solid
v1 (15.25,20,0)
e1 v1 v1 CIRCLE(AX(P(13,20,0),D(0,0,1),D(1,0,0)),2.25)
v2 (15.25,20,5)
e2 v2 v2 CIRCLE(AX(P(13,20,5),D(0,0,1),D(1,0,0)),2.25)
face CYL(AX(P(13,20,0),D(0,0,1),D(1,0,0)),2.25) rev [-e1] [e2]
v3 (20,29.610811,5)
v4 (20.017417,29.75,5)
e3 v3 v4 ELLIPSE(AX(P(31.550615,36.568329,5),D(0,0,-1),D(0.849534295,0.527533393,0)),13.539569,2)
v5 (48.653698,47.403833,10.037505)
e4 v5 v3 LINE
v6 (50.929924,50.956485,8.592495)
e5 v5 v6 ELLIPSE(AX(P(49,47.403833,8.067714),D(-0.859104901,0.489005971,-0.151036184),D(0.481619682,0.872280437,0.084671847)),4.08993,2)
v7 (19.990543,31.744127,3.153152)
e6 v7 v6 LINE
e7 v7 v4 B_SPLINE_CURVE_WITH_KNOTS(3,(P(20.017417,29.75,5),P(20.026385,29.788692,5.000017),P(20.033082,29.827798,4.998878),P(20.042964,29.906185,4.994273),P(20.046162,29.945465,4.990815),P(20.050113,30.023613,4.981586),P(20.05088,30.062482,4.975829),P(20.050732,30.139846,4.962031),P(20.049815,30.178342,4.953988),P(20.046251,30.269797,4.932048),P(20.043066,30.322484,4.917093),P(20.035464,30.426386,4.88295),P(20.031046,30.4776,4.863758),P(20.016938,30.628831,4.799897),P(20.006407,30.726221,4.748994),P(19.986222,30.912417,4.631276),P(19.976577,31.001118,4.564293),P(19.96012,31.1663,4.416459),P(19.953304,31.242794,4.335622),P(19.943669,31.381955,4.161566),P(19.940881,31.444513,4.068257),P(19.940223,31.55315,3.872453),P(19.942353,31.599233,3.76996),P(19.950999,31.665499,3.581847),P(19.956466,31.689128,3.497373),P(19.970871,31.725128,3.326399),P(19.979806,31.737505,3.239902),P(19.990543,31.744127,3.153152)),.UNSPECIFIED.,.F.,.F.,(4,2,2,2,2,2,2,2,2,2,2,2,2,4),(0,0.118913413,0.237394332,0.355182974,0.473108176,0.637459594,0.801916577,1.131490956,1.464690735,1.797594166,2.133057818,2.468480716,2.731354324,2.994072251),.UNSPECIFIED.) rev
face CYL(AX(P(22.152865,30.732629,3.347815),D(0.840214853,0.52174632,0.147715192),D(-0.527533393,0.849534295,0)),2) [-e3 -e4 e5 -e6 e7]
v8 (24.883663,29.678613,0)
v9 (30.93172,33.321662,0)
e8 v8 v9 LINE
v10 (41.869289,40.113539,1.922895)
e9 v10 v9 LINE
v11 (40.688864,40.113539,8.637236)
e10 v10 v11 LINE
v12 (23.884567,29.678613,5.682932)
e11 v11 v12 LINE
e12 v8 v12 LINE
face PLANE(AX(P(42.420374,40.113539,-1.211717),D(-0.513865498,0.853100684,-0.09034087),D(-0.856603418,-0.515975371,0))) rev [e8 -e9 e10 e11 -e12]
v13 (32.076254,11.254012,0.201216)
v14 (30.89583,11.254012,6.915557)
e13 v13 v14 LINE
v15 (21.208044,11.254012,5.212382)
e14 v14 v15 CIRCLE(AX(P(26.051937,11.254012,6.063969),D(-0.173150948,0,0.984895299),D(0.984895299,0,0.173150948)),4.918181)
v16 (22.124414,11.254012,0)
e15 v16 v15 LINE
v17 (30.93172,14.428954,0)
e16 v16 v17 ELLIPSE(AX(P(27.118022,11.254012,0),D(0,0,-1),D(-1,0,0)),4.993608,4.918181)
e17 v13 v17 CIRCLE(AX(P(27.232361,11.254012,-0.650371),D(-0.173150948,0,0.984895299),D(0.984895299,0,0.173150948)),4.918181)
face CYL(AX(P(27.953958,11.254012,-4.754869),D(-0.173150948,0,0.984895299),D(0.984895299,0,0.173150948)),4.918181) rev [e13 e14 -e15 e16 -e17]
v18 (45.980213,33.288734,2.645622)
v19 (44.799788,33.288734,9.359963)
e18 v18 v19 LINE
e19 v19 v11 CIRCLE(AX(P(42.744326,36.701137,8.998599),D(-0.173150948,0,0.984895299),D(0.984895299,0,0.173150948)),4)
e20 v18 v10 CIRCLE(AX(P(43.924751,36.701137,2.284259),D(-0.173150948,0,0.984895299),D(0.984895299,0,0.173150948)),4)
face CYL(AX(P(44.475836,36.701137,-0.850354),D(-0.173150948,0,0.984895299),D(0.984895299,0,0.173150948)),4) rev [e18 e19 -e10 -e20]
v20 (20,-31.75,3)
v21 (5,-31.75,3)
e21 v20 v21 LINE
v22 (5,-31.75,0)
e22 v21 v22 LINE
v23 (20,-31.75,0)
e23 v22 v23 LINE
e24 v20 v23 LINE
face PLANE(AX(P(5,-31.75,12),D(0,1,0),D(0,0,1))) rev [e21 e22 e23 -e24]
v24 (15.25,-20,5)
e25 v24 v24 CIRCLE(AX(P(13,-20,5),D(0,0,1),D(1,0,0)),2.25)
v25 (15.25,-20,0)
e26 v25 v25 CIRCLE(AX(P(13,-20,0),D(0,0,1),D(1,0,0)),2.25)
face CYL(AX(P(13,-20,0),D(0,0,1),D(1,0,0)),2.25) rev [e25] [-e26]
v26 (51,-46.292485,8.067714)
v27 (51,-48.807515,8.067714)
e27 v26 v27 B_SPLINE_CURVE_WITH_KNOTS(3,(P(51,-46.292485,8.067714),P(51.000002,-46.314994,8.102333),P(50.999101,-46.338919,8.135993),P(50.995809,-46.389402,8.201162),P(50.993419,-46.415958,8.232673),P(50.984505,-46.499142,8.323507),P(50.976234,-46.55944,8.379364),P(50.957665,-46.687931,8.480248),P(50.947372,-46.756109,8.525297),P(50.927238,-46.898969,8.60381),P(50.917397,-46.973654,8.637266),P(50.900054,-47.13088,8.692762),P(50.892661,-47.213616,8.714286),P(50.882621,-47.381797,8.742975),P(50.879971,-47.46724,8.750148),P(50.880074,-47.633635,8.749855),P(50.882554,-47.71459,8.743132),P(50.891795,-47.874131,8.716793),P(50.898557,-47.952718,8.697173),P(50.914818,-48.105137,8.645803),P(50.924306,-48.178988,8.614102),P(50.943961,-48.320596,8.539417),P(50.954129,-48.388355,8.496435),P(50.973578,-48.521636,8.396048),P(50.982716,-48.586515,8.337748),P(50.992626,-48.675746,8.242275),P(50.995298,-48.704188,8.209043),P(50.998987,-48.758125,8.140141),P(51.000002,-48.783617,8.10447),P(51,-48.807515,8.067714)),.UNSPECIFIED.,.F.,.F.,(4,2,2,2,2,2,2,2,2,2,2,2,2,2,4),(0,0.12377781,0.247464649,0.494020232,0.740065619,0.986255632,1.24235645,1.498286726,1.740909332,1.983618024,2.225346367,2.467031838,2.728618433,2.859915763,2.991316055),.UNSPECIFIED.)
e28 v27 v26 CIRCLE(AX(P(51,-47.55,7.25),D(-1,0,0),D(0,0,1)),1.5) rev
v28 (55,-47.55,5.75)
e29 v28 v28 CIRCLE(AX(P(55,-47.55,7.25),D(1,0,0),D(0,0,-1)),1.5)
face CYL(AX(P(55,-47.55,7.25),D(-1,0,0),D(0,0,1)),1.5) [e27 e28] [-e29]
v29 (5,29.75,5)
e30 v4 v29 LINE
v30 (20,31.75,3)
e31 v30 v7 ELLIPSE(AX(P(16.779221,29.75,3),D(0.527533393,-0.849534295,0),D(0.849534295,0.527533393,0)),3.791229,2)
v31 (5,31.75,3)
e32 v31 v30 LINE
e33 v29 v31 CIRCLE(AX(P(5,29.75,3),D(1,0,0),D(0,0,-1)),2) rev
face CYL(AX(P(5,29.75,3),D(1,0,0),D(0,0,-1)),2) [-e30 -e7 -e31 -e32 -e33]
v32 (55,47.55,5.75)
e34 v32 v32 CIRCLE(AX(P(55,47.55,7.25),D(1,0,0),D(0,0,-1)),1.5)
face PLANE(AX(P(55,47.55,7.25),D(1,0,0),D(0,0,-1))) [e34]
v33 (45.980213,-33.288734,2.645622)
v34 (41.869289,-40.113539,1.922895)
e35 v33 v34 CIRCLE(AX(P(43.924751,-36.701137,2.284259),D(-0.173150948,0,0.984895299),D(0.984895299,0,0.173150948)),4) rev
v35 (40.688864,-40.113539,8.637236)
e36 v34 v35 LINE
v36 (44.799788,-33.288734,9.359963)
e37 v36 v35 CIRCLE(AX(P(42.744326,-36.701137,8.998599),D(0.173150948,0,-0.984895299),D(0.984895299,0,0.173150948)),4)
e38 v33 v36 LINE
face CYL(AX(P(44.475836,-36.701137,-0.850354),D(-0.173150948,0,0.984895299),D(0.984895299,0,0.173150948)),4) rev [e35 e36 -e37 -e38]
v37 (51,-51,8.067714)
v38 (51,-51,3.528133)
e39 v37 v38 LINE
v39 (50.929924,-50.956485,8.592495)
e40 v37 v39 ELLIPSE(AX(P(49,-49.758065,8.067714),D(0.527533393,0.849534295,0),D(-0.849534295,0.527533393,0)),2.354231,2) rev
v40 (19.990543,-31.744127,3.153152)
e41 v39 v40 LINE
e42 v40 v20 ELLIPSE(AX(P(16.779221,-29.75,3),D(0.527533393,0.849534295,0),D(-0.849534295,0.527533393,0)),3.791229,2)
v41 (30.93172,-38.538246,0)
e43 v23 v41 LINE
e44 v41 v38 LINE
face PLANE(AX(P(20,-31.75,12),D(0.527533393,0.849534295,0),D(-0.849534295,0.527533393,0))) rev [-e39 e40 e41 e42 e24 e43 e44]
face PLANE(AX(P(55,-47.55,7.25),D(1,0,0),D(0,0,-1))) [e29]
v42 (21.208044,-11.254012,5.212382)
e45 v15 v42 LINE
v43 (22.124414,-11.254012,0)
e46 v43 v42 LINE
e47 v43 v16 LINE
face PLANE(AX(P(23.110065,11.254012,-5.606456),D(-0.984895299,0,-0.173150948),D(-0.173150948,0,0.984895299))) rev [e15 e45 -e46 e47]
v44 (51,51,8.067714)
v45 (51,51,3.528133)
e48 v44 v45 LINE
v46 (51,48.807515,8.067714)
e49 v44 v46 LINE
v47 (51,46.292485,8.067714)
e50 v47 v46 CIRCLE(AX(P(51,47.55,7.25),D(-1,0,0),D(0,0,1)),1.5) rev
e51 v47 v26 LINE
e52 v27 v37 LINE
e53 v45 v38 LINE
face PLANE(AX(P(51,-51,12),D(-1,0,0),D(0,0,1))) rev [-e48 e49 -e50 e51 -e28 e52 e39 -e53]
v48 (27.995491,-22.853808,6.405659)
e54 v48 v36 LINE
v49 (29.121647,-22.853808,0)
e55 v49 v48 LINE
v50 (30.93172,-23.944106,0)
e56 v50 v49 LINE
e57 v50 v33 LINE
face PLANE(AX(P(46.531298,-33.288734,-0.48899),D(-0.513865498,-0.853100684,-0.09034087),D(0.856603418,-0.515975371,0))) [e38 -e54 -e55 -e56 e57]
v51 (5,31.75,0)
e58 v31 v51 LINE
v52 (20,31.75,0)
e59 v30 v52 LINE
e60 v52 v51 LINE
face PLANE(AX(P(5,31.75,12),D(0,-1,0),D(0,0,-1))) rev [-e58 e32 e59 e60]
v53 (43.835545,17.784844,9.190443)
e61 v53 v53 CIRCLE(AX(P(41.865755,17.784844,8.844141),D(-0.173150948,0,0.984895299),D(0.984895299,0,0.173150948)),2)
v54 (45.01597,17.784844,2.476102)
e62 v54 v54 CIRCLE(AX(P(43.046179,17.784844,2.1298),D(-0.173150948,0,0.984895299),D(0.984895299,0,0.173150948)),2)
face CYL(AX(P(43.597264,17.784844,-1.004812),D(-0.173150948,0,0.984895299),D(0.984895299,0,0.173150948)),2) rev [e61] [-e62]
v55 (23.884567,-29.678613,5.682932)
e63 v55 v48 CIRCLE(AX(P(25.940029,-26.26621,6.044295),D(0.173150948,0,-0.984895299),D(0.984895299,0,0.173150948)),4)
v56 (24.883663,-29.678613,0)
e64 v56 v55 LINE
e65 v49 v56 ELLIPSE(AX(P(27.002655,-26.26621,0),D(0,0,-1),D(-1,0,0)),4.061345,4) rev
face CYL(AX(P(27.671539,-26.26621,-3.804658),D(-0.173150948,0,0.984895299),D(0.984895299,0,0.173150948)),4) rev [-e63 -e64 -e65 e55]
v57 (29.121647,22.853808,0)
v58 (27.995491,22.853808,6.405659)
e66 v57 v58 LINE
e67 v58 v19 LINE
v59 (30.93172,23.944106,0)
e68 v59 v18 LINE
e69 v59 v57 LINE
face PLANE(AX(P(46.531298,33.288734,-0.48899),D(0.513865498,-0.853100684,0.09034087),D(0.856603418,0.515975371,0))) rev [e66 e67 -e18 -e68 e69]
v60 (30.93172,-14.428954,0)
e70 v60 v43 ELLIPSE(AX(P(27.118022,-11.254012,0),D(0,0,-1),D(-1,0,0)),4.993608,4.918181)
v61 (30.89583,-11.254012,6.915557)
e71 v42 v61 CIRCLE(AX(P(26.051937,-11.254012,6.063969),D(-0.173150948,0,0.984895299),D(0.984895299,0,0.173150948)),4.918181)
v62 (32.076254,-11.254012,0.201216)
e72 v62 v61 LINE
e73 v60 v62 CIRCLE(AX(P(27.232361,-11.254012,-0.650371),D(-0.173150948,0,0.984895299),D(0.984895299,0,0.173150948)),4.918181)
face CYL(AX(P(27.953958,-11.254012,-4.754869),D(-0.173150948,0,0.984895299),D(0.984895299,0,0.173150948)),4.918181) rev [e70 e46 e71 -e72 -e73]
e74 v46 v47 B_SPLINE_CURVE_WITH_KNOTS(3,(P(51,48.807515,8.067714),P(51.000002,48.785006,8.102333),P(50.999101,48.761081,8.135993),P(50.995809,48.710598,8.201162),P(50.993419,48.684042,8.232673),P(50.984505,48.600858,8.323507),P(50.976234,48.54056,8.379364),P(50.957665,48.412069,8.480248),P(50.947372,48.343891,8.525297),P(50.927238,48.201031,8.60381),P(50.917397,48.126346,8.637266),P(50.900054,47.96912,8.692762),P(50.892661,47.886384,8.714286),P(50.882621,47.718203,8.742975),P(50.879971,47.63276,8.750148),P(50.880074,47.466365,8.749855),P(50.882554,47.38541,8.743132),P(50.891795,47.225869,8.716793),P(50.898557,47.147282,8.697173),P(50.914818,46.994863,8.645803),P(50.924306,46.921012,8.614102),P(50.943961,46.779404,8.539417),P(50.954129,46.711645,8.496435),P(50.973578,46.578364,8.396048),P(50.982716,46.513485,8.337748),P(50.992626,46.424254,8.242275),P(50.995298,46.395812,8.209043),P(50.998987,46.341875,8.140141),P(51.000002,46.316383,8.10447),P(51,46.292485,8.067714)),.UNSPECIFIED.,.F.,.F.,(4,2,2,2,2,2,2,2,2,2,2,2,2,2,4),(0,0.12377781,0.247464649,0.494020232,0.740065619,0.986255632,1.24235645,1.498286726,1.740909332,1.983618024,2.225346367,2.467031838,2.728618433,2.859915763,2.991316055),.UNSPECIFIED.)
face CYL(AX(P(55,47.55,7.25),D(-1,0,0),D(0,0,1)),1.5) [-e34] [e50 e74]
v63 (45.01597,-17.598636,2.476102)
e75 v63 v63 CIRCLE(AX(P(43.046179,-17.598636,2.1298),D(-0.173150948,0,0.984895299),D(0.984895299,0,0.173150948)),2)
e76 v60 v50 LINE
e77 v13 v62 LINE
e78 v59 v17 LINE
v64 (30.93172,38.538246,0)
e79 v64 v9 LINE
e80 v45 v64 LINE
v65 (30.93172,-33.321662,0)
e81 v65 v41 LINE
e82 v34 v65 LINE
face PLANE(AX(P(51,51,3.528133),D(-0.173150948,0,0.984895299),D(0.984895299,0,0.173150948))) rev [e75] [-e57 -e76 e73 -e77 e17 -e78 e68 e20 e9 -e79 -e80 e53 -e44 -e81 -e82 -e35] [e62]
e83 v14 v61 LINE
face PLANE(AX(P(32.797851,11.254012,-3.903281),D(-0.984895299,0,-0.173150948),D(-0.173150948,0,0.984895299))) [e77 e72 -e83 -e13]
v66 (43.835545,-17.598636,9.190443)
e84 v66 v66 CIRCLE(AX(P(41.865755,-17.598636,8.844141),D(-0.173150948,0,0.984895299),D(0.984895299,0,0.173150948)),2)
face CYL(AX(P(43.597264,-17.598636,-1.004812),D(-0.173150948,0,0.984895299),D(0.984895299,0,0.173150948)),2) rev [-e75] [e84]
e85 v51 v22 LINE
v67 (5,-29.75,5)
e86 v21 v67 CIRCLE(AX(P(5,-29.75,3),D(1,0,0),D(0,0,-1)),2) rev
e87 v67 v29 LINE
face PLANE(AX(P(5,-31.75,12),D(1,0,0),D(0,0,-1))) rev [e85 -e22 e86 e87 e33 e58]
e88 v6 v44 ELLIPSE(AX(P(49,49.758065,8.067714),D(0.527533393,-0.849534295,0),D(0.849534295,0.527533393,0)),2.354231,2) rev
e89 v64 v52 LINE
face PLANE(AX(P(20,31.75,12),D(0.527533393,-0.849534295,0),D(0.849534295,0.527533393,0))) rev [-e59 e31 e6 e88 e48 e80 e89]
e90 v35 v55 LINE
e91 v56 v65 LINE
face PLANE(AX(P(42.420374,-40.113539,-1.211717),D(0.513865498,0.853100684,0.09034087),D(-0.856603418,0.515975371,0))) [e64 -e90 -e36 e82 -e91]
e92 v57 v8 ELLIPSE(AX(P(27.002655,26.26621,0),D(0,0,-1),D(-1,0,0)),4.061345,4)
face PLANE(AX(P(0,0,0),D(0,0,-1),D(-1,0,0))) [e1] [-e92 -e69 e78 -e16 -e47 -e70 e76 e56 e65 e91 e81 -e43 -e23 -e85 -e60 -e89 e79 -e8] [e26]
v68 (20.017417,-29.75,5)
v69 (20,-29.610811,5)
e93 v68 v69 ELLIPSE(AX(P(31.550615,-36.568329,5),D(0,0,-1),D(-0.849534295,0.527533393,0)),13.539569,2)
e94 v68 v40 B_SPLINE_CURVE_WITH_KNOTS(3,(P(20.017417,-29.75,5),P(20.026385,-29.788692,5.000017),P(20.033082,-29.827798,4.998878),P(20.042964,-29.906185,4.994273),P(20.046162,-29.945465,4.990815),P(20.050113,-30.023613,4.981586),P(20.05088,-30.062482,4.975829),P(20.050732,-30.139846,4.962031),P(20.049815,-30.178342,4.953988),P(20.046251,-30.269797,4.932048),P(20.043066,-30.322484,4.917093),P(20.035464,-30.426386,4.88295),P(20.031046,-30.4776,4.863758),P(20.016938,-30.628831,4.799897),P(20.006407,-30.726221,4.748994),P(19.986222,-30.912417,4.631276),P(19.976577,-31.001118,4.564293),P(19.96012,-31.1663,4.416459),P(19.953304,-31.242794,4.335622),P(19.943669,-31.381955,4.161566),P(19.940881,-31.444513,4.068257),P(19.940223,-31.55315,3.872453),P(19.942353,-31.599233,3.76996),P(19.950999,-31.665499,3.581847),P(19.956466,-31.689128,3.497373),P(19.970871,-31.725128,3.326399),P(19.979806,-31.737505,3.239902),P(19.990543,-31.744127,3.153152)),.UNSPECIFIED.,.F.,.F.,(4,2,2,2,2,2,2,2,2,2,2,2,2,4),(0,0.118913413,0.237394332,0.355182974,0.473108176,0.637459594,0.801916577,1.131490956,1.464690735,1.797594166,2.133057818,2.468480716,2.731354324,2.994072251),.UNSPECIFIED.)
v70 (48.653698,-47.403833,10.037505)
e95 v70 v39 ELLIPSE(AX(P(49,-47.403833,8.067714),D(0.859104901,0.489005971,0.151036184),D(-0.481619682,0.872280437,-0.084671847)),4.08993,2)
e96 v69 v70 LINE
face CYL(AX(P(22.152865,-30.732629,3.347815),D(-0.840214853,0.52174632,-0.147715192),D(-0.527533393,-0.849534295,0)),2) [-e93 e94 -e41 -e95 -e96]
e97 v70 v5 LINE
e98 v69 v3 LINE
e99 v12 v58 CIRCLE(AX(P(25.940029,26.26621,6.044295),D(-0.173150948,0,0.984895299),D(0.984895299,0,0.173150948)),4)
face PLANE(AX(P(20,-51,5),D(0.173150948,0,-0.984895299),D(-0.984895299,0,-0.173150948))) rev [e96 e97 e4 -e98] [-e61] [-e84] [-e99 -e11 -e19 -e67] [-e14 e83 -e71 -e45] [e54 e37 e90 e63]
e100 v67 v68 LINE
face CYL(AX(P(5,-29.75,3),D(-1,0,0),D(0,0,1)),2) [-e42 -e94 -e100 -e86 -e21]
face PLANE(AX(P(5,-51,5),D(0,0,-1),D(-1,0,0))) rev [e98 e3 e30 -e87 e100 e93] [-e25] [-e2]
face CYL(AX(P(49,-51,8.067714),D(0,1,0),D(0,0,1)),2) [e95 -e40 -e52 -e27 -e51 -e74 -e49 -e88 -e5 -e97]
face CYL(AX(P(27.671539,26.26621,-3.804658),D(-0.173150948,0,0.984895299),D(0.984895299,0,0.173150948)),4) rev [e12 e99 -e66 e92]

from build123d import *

# Parameters (mm, degrees)
BOSS_EXTRUDE1_DEPTH     = 12
CUT_EXTRUDE1_DEPTH      = 74.116345642
CUT_EXTRUDE1_DEPTH_BACK = 74.116345642
SKETCH4_R               = 1.5
BOSS_EXTRUDE2_DEPTH     = 4
SKETCH5_R               = 2.25
CUT_EXTRUDE2_DEPTH      = 76.204404791
FILLET1_R               = 2
CUT_EXTRUDE6_DEPTH      = 100.869521891
CUT_EXTRUDE6_DEPTH_BACK = 100.869521891
CUT_EXTRUDE7_DEPTH      = 10
CUT_EXTRUDE8_DEPTH      = 76.685850531
SKETCH12_R              = 2
CUT_EXTRUDE9_DEPTH      = 10


with BuildPart() as part:
    # Sketch1 → Boss-Extrude1 (new body)
    with BuildSketch(Plane.XY):
        Polygon((5, 31.75), (20, 31.75), (51, 51), (51, -51), (20, -31.75), (5, -31.75), align=None)
    extrude(amount=BOSS_EXTRUDE1_DEPTH)

    # Sketch3 → Cut-Extrude1 (cut, two sides: drawn at the far end of the back side and taken through both)
    with BuildSketch(Plane(origin=(0, 0, 0), x_dir=(1, 0, 0), z_dir=(0, 1, 0)).offset(-CUT_EXTRUDE1_DEPTH_BACK)):
        Polygon((5, -5), (20, -5), (51, -10.45), (51, -12), (5, -12), align=None)
    extrude(amount=CUT_EXTRUDE1_DEPTH + CUT_EXTRUDE1_DEPTH_BACK, mode=Mode.SUBTRACT)

    # Sketch4 → Boss-Extrude2 (add)
    with BuildSketch(Plane(origin=(51, 0, 0), x_dir=(0, 0, -1), z_dir=(1, 0, 0))):
        with Locations(Location((-7.25, 47.55, 0), (0, 0, 180))):
            Circle(SKETCH4_R)
        with Locations(Location((-7.25, -47.55, 0), (0, 0, 180))):
            Circle(SKETCH4_R)
    extrude(amount=BOSS_EXTRUDE2_DEPTH)

    # Sketch5 → Cut-Extrude2 (cut, through all)
    with BuildSketch(Plane.XY.offset(5)):
        with Locations((13, 20)):
            Circle(SKETCH5_R)
        with Locations((13, -20)):
            Circle(SKETCH5_R)
    extrude(amount=-CUT_EXTRUDE2_DEPTH, mode=Mode.SUBTRACT)

    # Fillet1
    # the kernel refuses this fillet: 2 mm, written as the material it takes off along each edge
    with BuildSketch(Plane(origin=(25, 31.75, 5), x_dir=(0, 0, -1), z_dir=(-1, 0, 0))) as fillet1_piece_1_section:
        with BuildLine():
            CenterArc((FILLET1_R, FILLET1_R), FILLET1_R, 180, 90)
            Line((0, FILLET1_R), (0, 0))
            Line((0, 0), (FILLET1_R, 0))
        make_face()
    fillet1_piece_1 = extrude(amount=25, mode=Mode.PRIVATE)
    fillet1_piece_1 = split(fillet1_piece_1, bisect_by=Plane(origin=(18.715742413, 30.952517466, 4.969963475), z_dir=(0.5275333931354667, -0.8495342954389665, 0)), keep=Keep.TOP, mode=Mode.PRIVATE)
    fillet1_piece_1 = split(fillet1_piece_1, bisect_by=Plane(origin=(18.98425176, 30.56216658, 4.821424906), z_dir=(-0.17315094766757883, 0, 0.9848952986596187)), keep=Keep.TOP, mode=Mode.PRIVATE)
    add(fillet1_piece_1, mode=Mode.SUBTRACT)
    with BuildSketch(Plane(origin=(25, 31.75, 5), x_dir=(0, 0, -1), z_dir=(-1, 0, 0))) as fillet1_piece_2_section:
        with BuildLine():
            CenterArc((FILLET1_R, FILLET1_R), FILLET1_R, 180, 90)
            Line((0, FILLET1_R), (0, 0))
            Line((0, 0), (FILLET1_R, 0))
        make_face()
    fillet1_piece_2 = extrude(amount=25, mode=Mode.PRIVATE)
    fillet1_piece_2 = split(fillet1_piece_2, bisect_by=Plane(origin=(17.89893605, 30.445307063, 4.049330952), z_dir=(-0.5275333931354667, 0.8495342954389665, 0)), keep=Keep.TOP, mode=Mode.PRIVATE)
    fillet1_piece_2 = split(fillet1_piece_2, bisect_by=Plane(origin=(17.101561994, 31.604505702, 4.490435899), z_dir=(0.17315094766757883, 0, -0.9848952986596187)), keep=Keep.TOP, mode=Mode.PRIVATE)
    add(fillet1_piece_2, mode=Mode.SUBTRACT)
    with BuildSketch(Plane(origin=(25, 31.75, 5), x_dir=(0, 0, -1), z_dir=(-1, 0, 0))) as fillet1_piece_3_section:
        with BuildLine():
            CenterArc((FILLET1_R, FILLET1_R), FILLET1_R, 180, 90)
            Line((0, FILLET1_R), (0, 0))
            Line((0, 0), (FILLET1_R, 0))
        make_face()
    fillet1_piece_3 = extrude(amount=25, mode=Mode.PRIVATE)
    fillet1_piece_3 = split(fillet1_piece_3, bisect_by=Plane(origin=(11.619741212, 26.546129624, 4.600643736), z_dir=(-0.5275333931354667, 0.8495342954389665, 0)), keep=Keep.TOP, mode=Mode.PRIVATE)
    fillet1_piece_3 = split(fillet1_piece_3, bisect_by=Plane(origin=(8.954230644, 31.275365282, 3.058082484), z_dir=(-0.17315094766757883, 0, 0.9848952986596187)), keep=Keep.TOP, mode=Mode.PRIVATE)
    add(fillet1_piece_3, mode=Mode.SUBTRACT)
    with BuildSketch(Plane(origin=(54.833361303, 53.380393713, 11.123929648), x_dir=(0.12548912150255187, 0.07792469641690664, -0.9890299399274274), z_dir=(-0.8402148531842905, -0.5217463201224826, -0.14771519193078717))) as fillet1_piece_4_section:
        with BuildLine():
            CenterArc((FILLET1_R * 0.9124716824, FILLET1_R), FILLET1_R, 185.240868247, 84.759131753)
            Line((-FILLET1_R * 0.0833478159779, FILLET1_R * 0.908657093052), (0, 0))
            Line((0, 0), (FILLET1_R * 0.9124716824, 0))
        make_face()
    fillet1_piece_4 = extrude(amount=46.020041731, mode=Mode.PRIVATE)
    fillet1_piece_4 = split(fillet1_piece_4, bisect_by=Plane(origin=(38.858531896, 31.75, 7.92634129), z_dir=(0, 1, 0)), keep=Keep.TOP, mode=Mode.PRIVATE)
    fillet1_piece_4 = split(fillet1_piece_4, bisect_by=Plane(origin=(38.858531896, 42.968514932, 5), z_dir=(0, 0, 1)), keep=Keep.TOP, mode=Mode.PRIVATE)
    add(fillet1_piece_4, mode=Mode.SUBTRACT)
    with BuildSketch(Plane(origin=(54.833361303, 53.380393713, 11.123929648), x_dir=(0.12548912150255187, 0.07792469641690664, -0.9890299399274274), z_dir=(-0.8402148531842905, -0.5217463201224826, -0.14771519193078717))) as fillet1_piece_5_section:
        with BuildLine():
            CenterArc((FILLET1_R * 0.9124716824, FILLET1_R), FILLET1_R, 185.240868247, 84.759131753)
            Line((-FILLET1_R * 0.0833478159779, FILLET1_R * 0.908657093052), (0, 0))
            Line((0, 0), (FILLET1_R * 0.9124716824, 0))
        make_face()
    fillet1_piece_5 = extrude(amount=46.020041731, mode=Mode.PRIVATE)
    fillet1_piece_5 = split(fillet1_piece_5, bisect_by=Plane(origin=(21.093126752, 31.75, 5.163454889), z_dir=(0, -1, 0)), keep=Keep.TOP, mode=Mode.PRIVATE)
    fillet1_piece_5 = split(fillet1_piece_5, bisect_by=Plane(origin=(21.093126752, 31.172659336, 5), z_dir=(0, 0, 1)), keep=Keep.TOP, mode=Mode.PRIVATE)
    add(fillet1_piece_5, mode=Mode.SUBTRACT)
    with BuildSketch(Plane(origin=(54.833361303, 53.380393713, 11.123929648), x_dir=(0.12548912150255187, 0.07792469641690664, -0.9890299399274274), z_dir=(-0.8402148531842905, -0.5217463201224826, -0.14771519193078717))) as fillet1_piece_6_section:
        with BuildLine():
            CenterArc((FILLET1_R * 0.9124716824, FILLET1_R), FILLET1_R, 185.240868247, 84.759131753)
            Line((-FILLET1_R * 0.0833478159779, FILLET1_R * 0.908657093052), (0, 0))
            Line((0, 0), (FILLET1_R * 0.9124716824, 0))
        make_face()
    fillet1_piece_6 = extrude(amount=46.020041731, mode=Mode.PRIVATE)
    fillet1_piece_6 = split(fillet1_piece_6, bisect_by=Plane(origin=(22.647114754, 31.75, 4.574160992), z_dir=(0, 1, 0)), keep=Keep.TOP, mode=Mode.PRIVATE)
    fillet1_piece_6 = split(fillet1_piece_6, bisect_by=Plane(origin=(22.647114754, 33.254110258, 5), z_dir=(0, 0, -1)), keep=Keep.TOP, mode=Mode.PRIVATE)
    add(fillet1_piece_6, mode=Mode.SUBTRACT)
    with BuildSketch(Plane(origin=(16.166638697, -29.369606287, 4.326070352), x_dir=(0.12548912150255273, -0.07792469641690525, -0.9890299399274274), z_dir=(0.8402148531842905, -0.5217463201224826, 0.14771519193078717))) as fillet1_piece_7_section:
        with BuildLine():
            CenterArc((FILLET1_R * 0.9124716824, FILLET1_R), FILLET1_R, 185.240868247, 84.759131753)
            Line((-FILLET1_R * 0.0833478159779, FILLET1_R * 0.908657093052), (0, 0))
            Line((0, 0), (FILLET1_R * 0.9124716824, 0))
        make_face()
    fillet1_piece_7 = extrude(amount=46.020041731, mode=Mode.PRIVATE)
    fillet1_piece_7 = split(fillet1_piece_7, bisect_by=Plane(origin=(21.093126752, -31.172659336, 5), z_dir=(0, 0, 1)), keep=Keep.TOP, mode=Mode.PRIVATE)
    fillet1_piece_7 = split(fillet1_piece_7, bisect_by=Plane(origin=(21.093126752, -31.75, 5.163454889), z_dir=(0, 1, 0)), keep=Keep.TOP, mode=Mode.PRIVATE)
    add(fillet1_piece_7, mode=Mode.SUBTRACT)
    with BuildSketch(Plane(origin=(16.166638697, -29.369606287, 4.326070352), x_dir=(0.12548912150255273, -0.07792469641690525, -0.9890299399274274), z_dir=(0.8402148531842905, -0.5217463201224826, 0.14771519193078717))) as fillet1_piece_8_section:
        with BuildLine():
            CenterArc((FILLET1_R * 0.9124716824, FILLET1_R), FILLET1_R, 185.240868247, 84.759131753)
            Line((-FILLET1_R * 0.0833478159779, FILLET1_R * 0.908657093052), (0, 0))
            Line((0, 0), (FILLET1_R * 0.9124716824, 0))
        make_face()
    fillet1_piece_8 = extrude(amount=46.020041731, mode=Mode.PRIVATE)
    fillet1_piece_8 = split(fillet1_piece_8, bisect_by=Plane(origin=(22.647114754, -33.254110258, 5), z_dir=(0, 0, -1)), keep=Keep.TOP, mode=Mode.PRIVATE)
    fillet1_piece_8 = split(fillet1_piece_8, bisect_by=Plane(origin=(22.647114754, -31.75, 4.574160992), z_dir=(0, -1, 0)), keep=Keep.TOP, mode=Mode.PRIVATE)
    add(fillet1_piece_8, mode=Mode.SUBTRACT)
    with BuildSketch(Plane(origin=(16.166638697, -29.369606287, 4.326070352), x_dir=(0.12548912150255273, -0.07792469641690525, -0.9890299399274274), z_dir=(0.8402148531842905, -0.5217463201224826, 0.14771519193078717))) as fillet1_piece_9_section:
        with BuildLine():
            CenterArc((FILLET1_R * 0.9124716824, FILLET1_R), FILLET1_R, 185.240868247, 84.759131753)
            Line((-FILLET1_R * 0.0833478159779, FILLET1_R * 0.908657093052), (0, 0))
            Line((0, 0), (FILLET1_R * 0.9124716824, 0))
        make_face()
    fillet1_piece_9 = extrude(amount=46.020041731, mode=Mode.PRIVATE)
    fillet1_piece_9 = split(fillet1_piece_9, bisect_by=Plane(origin=(38.858531896, -42.968514932, 5), z_dir=(0, 0, 1)), keep=Keep.TOP, mode=Mode.PRIVATE)
    fillet1_piece_9 = split(fillet1_piece_9, bisect_by=Plane(origin=(38.858531896, -31.75, 7.92634129), z_dir=(0, -1, 0)), keep=Keep.TOP, mode=Mode.PRIVATE)
    add(fillet1_piece_9, mode=Mode.SUBTRACT)
    with BuildSketch(Plane(origin=(0, -31.75, 5), x_dir=(0, 1, 0), z_dir=(1, 0, 0))) as fillet1_piece_10_section:
        with BuildLine():
            CenterArc((FILLET1_R, -FILLET1_R), FILLET1_R, 90, 90)
            Line((0, -FILLET1_R), (0, 0))
            Line((0, 0), (FILLET1_R, 0))
        make_face()
    fillet1_piece_10 = extrude(amount=25, mode=Mode.PRIVATE)
    fillet1_piece_10 = split(fillet1_piece_10, bisect_by=Plane(origin=(8.954230648, -31.275365282, 3.058082485), z_dir=(-0.17315094766757883, 0, 0.9848952986596187)), keep=Keep.TOP, mode=Mode.PRIVATE)
    fillet1_piece_10 = split(fillet1_piece_10, bisect_by=Plane(origin=(11.619741215, -26.546129625, 4.600643736), z_dir=(-0.5275333931354667, -0.8495342954389665, 0)), keep=Keep.TOP, mode=Mode.PRIVATE)
    add(fillet1_piece_10, mode=Mode.SUBTRACT)
    with BuildSketch(Plane(origin=(0, -31.75, 5), x_dir=(0, 1, 0), z_dir=(1, 0, 0))) as fillet1_piece_11_section:
        with BuildLine():
            CenterArc((FILLET1_R, -FILLET1_R), FILLET1_R, 90, 90)
            Line((0, -FILLET1_R), (0, 0))
            Line((0, 0), (FILLET1_R, 0))
        make_face()
    fillet1_piece_11 = extrude(amount=25, mode=Mode.PRIVATE)
    fillet1_piece_11 = split(fillet1_piece_11, bisect_by=Plane(origin=(17.101561993, -31.604505702, 4.490435899), z_dir=(0.17315094766757883, 0, -0.9848952986596187)), keep=Keep.TOP, mode=Mode.PRIVATE)
    fillet1_piece_11 = split(fillet1_piece_11, bisect_by=Plane(origin=(17.89893605, -30.445307063, 4.049330952), z_dir=(-0.5275333931354667, -0.8495342954389665, 0)), keep=Keep.TOP, mode=Mode.PRIVATE)
    add(fillet1_piece_11, mode=Mode.SUBTRACT)
    with BuildSketch(Plane(origin=(0, -31.75, 5), x_dir=(0, 1, 0), z_dir=(1, 0, 0))) as fillet1_piece_12_section:
        with BuildLine():
            CenterArc((FILLET1_R, -FILLET1_R), FILLET1_R, 90, 90)
            Line((0, -FILLET1_R), (0, 0))
            Line((0, 0), (FILLET1_R, 0))
        make_face()
    fillet1_piece_12 = extrude(amount=25, mode=Mode.PRIVATE)
    fillet1_piece_12 = split(fillet1_piece_12, bisect_by=Plane(origin=(18.984251758, -30.56216658, 4.821424906), z_dir=(-0.17315094766757883, 0, 0.9848952986596187)), keep=Keep.TOP, mode=Mode.PRIVATE)
    fillet1_piece_12 = split(fillet1_piece_12, bisect_by=Plane(origin=(18.715742412, -30.952517465, 4.969963474), z_dir=(0.5275333931354667, 0.8495342954389665, 0)), keep=Keep.TOP, mode=Mode.PRIVATE)
    add(fillet1_piece_12, mode=Mode.SUBTRACT)
    with BuildSketch(Plane(origin=(51, 56.95571402, 10.45), x_dir=(0, 0, -1), z_dir=(0, -1, 0))) as fillet1_piece_13_section:
        with BuildLine():
            CenterArc((FILLET1_R * 1.19114280398, -FILLET1_R), FILLET1_R, 90, 99.971072614)
            Line((FILLET1_R * 0.206247505316, -FILLET1_R * 1.17315094767), (0, 0))
            Line((0, 0), (FILLET1_R * 1.19114280398, 0))
        make_face()
    fillet1_piece_13 = extrude(amount=113.91142804, mode=Mode.PRIVATE)
    fillet1_piece_13 = fillet1_piece_13 - Plane(origin=(50.456443641, -47.55, 7.25), x_dir=(0, 0, 1), z_dir=(-1, 0, 0)) * Cylinder(1.5, 238, mode=Mode.PRIVATE)
    fillet1_piece_13 = fillet1_piece_13 - Plane(origin=(50.456443641, 47.55, 7.25), x_dir=(0, 0, 1), z_dir=(-1, 0, 0)) * Cylinder(1.5, 238, mode=Mode.PRIVATE)
    add(fillet1_piece_13, mode=Mode.SUBTRACT)
    with BuildSketch(Plane(origin=(51, 56, 0), x_dir=(-1, 0, 0), z_dir=(0, -1, 0))) as fillet1_piece_14:
        with BuildLine():
            CenterArc((FILLET1_R, -FILLET1_R), FILLET1_R, 90, 90)
            Line((0, -FILLET1_R), (0, 0))
            Line((0, 0), (FILLET1_R, 0))
        make_face()
    extrude(amount=112, mode=Mode.SUBTRACT)
    with BuildSketch(Plane(origin=(25, 31.75, 5), x_dir=(0, 0, -1), z_dir=(-1, 0, 0))) as fillet1_piece_15a_section:
        with BuildLine():
            CenterArc((FILLET1_R, FILLET1_R), FILLET1_R, 180, 90)
            Line((0, FILLET1_R), (0, 0))
            Line((0, 0), (FILLET1_R, 0))
        make_face()
    fillet1_piece_15a = extrude(amount=25, mode=Mode.PRIVATE)
    fillet1_piece_15a = split(fillet1_piece_15a, bisect_by=Plane(origin=(21.447626234, 32.648929194, 4.553184852), z_dir=(0.5275333931354667, -0.8495342954389665, 0)), keep=Keep.TOP, mode=Mode.PRIVATE)
    fillet1_piece_15a = split(fillet1_piece_15a, bisect_by=Plane(origin=(22.147583846, 31.288330463, 5.377559095), z_dir=(0.17315094766757883, 0, -0.9848952986596187)), keep=Keep.TOP, mode=Mode.PRIVATE)
    with BuildSketch(Plane(origin=(54.833361303, 53.380393713, 11.123929648), x_dir=(0.12548912150255187, 0.07792469641690664, -0.9890299399274274), z_dir=(-0.8402148531842905, -0.5217463201224826, -0.14771519193078717))) as fillet1_piece_15b_section:
        with BuildLine():
            CenterArc((FILLET1_R * 0.9124716824, FILLET1_R), FILLET1_R, 185.240868247, 84.759131753)
            Line((-FILLET1_R * 0.0833478159779, FILLET1_R * 0.908657093052), (0, 0))
            Line((0, 0), (FILLET1_R * 0.9124716824, 0))
        make_face()
    fillet1_piece_15b = extrude(amount=46.020041731, mode=Mode.PRIVATE)
    fillet1_piece_15b = split(fillet1_piece_15b, bisect_by=Plane(origin=(18.418601741, 31.75, 4.307776875), z_dir=(0, -1, 0)), keep=Keep.TOP, mode=Mode.PRIVATE)
    fillet1_piece_15b = split(fillet1_piece_15b, bisect_by=Plane(origin=(18.418601741, 30.298172554, 5), z_dir=(0, 0, -1)), keep=Keep.TOP, mode=Mode.PRIVATE)
    fillet1_piece_15 = fillet1_piece_15a & fillet1_piece_15b
    add(fillet1_piece_15, mode=Mode.SUBTRACT)
    with BuildSketch(Plane(origin=(0, -31.75, 5), x_dir=(0, 1, 0), z_dir=(1, 0, 0))) as fillet1_piece_16a_section:
        with BuildLine():
            CenterArc((FILLET1_R, -FILLET1_R), FILLET1_R, 90, 90)
            Line((0, -FILLET1_R), (0, 0))
            Line((0, 0), (FILLET1_R, 0))
        make_face()
    fillet1_piece_16a = extrude(amount=25, mode=Mode.PRIVATE)
    fillet1_piece_16a = split(fillet1_piece_16a, bisect_by=Plane(origin=(22.147583841, -31.288330462, 5.377559095), z_dir=(0.17315094766757883, 0, -0.9848952986596187)), keep=Keep.TOP, mode=Mode.PRIVATE)
    fillet1_piece_16a = split(fillet1_piece_16a, bisect_by=Plane(origin=(21.447626231, -32.648929192, 4.553184851), z_dir=(0.5275333931354667, 0.8495342954389665, 0)), keep=Keep.TOP, mode=Mode.PRIVATE)
    with BuildSketch(Plane(origin=(16.166638697, -29.369606287, 4.326070352), x_dir=(0.12548912150255273, -0.07792469641690525, -0.9890299399274274), z_dir=(0.8402148531842905, -0.5217463201224826, 0.14771519193078717))) as fillet1_piece_16b_section:
        with BuildLine():
            CenterArc((FILLET1_R * 0.9124716824, FILLET1_R), FILLET1_R, 185.240868247, 84.759131753)
            Line((-FILLET1_R * 0.0833478159779, FILLET1_R * 0.908657093052), (0, 0))
            Line((0, 0), (FILLET1_R * 0.9124716824, 0))
        make_face()
    fillet1_piece_16b = extrude(amount=46.020041731, mode=Mode.PRIVATE)
    fillet1_piece_16b = split(fillet1_piece_16b, bisect_by=Plane(origin=(18.418601741, -30.298172554, 5), z_dir=(0, 0, -1)), keep=Keep.TOP, mode=Mode.PRIVATE)
    fillet1_piece_16b = split(fillet1_piece_16b, bisect_by=Plane(origin=(18.418601741, -31.75, 4.307776875), z_dir=(0, 1, 0)), keep=Keep.TOP, mode=Mode.PRIVATE)
    fillet1_piece_16 = fillet1_piece_16a & fillet1_piece_16b
    add(fillet1_piece_16, mode=Mode.SUBTRACT)

    # Sketch9 → Cut-Extrude6 (cut, two sides: drawn at the far end of the back side and taken through both)
    with BuildSketch(Plane(origin=(0, -31.75, 0), x_dir=(-1, 0, 0), z_dir=(0, -1, 0)).offset(-CUT_EXTRUDE6_DEPTH_BACK)):
        Polygon((-51, -3.528133081), (-30.931720088, 0), (-51, 0), align=None)
    extrude(amount=CUT_EXTRUDE6_DEPTH + CUT_EXTRUDE6_DEPTH_BACK, mode=Mode.SUBTRACT)

    # Sketch10 → Cut-Extrude7 (cut)
    with BuildSketch(Plane(origin=(-0.253052758, 0, 1.43938266), x_dir=(0.9848952986596188, 0, 0.17315094766757885), z_dir=(-0.17315094766757885, 0, 0.9848952986596188))):
        with BuildLine():
            Line((45.743787307, 33.288733998), (28.681773623, 22.853807596))
            ThreePointArc((28.681773623, 22.853807596), (23.182385605, 24.179225052), (24.507803062, 29.67861307))
            Line((24.507803062, 29.67861307), (41.569816746, 40.113539472))
            ThreePointArc((41.569816746, 40.113539472), (47.069204764, 38.788122016), (45.743787307, 33.288733998))
        make_face()
    cut_extrude7 = extrude(amount=-CUT_EXTRUDE7_DEPTH, mode=Mode.SUBTRACT)

    # Mirror2: Cut-Extrude7 across plane
    add(cut_extrude7.mirror(Plane.ZX), mode=Mode.SUBTRACT)

    # Sketch11 → Cut-Extrude8 (cut, through all)
    with BuildSketch(Plane(origin=(-0.253052758, 0, 1.43938266), x_dir=(0.9848952986596188, 0, 0.17315094766757885), z_dir=(-0.17315094766757885, 0, 0.9848952986596188))):
        with BuildLine():
            Line((31.626592624, 11.254011747), (31.626592624, -11.254011747))
            ThreePointArc((31.626592624, -11.254011747), (26.708411928, -16.172192443), (21.790231232, -11.254011747))
            Line((21.790231232, -11.254011747), (21.790231232, 11.254011747))
            ThreePointArc((21.790231232, 11.254011747), (26.708411928, 16.172192443), (31.626592624, 11.254011747))
        make_face()
    extrude(amount=-CUT_EXTRUDE8_DEPTH, mode=Mode.SUBTRACT)

    # Sketch12 → Cut-Extrude9 (cut)
    with BuildSketch(Plane(origin=(-0.253052758, 0, 1.43938266), x_dir=(0.9848952986596187, 0, 0.17315094766757885), z_dir=(-0.17315094766757885, 0, 0.9848952986596188))):
        with Locations((42.764756369, 17.78484358)):
            Circle(SKETCH12_R)
        with Locations((42.764756369, -17.598635798)):
            Circle(SKETCH12_R)
    extrude(amount=-CUT_EXTRUDE9_DEPTH, mode=Mode.SUBTRACT)


solid = part.part
